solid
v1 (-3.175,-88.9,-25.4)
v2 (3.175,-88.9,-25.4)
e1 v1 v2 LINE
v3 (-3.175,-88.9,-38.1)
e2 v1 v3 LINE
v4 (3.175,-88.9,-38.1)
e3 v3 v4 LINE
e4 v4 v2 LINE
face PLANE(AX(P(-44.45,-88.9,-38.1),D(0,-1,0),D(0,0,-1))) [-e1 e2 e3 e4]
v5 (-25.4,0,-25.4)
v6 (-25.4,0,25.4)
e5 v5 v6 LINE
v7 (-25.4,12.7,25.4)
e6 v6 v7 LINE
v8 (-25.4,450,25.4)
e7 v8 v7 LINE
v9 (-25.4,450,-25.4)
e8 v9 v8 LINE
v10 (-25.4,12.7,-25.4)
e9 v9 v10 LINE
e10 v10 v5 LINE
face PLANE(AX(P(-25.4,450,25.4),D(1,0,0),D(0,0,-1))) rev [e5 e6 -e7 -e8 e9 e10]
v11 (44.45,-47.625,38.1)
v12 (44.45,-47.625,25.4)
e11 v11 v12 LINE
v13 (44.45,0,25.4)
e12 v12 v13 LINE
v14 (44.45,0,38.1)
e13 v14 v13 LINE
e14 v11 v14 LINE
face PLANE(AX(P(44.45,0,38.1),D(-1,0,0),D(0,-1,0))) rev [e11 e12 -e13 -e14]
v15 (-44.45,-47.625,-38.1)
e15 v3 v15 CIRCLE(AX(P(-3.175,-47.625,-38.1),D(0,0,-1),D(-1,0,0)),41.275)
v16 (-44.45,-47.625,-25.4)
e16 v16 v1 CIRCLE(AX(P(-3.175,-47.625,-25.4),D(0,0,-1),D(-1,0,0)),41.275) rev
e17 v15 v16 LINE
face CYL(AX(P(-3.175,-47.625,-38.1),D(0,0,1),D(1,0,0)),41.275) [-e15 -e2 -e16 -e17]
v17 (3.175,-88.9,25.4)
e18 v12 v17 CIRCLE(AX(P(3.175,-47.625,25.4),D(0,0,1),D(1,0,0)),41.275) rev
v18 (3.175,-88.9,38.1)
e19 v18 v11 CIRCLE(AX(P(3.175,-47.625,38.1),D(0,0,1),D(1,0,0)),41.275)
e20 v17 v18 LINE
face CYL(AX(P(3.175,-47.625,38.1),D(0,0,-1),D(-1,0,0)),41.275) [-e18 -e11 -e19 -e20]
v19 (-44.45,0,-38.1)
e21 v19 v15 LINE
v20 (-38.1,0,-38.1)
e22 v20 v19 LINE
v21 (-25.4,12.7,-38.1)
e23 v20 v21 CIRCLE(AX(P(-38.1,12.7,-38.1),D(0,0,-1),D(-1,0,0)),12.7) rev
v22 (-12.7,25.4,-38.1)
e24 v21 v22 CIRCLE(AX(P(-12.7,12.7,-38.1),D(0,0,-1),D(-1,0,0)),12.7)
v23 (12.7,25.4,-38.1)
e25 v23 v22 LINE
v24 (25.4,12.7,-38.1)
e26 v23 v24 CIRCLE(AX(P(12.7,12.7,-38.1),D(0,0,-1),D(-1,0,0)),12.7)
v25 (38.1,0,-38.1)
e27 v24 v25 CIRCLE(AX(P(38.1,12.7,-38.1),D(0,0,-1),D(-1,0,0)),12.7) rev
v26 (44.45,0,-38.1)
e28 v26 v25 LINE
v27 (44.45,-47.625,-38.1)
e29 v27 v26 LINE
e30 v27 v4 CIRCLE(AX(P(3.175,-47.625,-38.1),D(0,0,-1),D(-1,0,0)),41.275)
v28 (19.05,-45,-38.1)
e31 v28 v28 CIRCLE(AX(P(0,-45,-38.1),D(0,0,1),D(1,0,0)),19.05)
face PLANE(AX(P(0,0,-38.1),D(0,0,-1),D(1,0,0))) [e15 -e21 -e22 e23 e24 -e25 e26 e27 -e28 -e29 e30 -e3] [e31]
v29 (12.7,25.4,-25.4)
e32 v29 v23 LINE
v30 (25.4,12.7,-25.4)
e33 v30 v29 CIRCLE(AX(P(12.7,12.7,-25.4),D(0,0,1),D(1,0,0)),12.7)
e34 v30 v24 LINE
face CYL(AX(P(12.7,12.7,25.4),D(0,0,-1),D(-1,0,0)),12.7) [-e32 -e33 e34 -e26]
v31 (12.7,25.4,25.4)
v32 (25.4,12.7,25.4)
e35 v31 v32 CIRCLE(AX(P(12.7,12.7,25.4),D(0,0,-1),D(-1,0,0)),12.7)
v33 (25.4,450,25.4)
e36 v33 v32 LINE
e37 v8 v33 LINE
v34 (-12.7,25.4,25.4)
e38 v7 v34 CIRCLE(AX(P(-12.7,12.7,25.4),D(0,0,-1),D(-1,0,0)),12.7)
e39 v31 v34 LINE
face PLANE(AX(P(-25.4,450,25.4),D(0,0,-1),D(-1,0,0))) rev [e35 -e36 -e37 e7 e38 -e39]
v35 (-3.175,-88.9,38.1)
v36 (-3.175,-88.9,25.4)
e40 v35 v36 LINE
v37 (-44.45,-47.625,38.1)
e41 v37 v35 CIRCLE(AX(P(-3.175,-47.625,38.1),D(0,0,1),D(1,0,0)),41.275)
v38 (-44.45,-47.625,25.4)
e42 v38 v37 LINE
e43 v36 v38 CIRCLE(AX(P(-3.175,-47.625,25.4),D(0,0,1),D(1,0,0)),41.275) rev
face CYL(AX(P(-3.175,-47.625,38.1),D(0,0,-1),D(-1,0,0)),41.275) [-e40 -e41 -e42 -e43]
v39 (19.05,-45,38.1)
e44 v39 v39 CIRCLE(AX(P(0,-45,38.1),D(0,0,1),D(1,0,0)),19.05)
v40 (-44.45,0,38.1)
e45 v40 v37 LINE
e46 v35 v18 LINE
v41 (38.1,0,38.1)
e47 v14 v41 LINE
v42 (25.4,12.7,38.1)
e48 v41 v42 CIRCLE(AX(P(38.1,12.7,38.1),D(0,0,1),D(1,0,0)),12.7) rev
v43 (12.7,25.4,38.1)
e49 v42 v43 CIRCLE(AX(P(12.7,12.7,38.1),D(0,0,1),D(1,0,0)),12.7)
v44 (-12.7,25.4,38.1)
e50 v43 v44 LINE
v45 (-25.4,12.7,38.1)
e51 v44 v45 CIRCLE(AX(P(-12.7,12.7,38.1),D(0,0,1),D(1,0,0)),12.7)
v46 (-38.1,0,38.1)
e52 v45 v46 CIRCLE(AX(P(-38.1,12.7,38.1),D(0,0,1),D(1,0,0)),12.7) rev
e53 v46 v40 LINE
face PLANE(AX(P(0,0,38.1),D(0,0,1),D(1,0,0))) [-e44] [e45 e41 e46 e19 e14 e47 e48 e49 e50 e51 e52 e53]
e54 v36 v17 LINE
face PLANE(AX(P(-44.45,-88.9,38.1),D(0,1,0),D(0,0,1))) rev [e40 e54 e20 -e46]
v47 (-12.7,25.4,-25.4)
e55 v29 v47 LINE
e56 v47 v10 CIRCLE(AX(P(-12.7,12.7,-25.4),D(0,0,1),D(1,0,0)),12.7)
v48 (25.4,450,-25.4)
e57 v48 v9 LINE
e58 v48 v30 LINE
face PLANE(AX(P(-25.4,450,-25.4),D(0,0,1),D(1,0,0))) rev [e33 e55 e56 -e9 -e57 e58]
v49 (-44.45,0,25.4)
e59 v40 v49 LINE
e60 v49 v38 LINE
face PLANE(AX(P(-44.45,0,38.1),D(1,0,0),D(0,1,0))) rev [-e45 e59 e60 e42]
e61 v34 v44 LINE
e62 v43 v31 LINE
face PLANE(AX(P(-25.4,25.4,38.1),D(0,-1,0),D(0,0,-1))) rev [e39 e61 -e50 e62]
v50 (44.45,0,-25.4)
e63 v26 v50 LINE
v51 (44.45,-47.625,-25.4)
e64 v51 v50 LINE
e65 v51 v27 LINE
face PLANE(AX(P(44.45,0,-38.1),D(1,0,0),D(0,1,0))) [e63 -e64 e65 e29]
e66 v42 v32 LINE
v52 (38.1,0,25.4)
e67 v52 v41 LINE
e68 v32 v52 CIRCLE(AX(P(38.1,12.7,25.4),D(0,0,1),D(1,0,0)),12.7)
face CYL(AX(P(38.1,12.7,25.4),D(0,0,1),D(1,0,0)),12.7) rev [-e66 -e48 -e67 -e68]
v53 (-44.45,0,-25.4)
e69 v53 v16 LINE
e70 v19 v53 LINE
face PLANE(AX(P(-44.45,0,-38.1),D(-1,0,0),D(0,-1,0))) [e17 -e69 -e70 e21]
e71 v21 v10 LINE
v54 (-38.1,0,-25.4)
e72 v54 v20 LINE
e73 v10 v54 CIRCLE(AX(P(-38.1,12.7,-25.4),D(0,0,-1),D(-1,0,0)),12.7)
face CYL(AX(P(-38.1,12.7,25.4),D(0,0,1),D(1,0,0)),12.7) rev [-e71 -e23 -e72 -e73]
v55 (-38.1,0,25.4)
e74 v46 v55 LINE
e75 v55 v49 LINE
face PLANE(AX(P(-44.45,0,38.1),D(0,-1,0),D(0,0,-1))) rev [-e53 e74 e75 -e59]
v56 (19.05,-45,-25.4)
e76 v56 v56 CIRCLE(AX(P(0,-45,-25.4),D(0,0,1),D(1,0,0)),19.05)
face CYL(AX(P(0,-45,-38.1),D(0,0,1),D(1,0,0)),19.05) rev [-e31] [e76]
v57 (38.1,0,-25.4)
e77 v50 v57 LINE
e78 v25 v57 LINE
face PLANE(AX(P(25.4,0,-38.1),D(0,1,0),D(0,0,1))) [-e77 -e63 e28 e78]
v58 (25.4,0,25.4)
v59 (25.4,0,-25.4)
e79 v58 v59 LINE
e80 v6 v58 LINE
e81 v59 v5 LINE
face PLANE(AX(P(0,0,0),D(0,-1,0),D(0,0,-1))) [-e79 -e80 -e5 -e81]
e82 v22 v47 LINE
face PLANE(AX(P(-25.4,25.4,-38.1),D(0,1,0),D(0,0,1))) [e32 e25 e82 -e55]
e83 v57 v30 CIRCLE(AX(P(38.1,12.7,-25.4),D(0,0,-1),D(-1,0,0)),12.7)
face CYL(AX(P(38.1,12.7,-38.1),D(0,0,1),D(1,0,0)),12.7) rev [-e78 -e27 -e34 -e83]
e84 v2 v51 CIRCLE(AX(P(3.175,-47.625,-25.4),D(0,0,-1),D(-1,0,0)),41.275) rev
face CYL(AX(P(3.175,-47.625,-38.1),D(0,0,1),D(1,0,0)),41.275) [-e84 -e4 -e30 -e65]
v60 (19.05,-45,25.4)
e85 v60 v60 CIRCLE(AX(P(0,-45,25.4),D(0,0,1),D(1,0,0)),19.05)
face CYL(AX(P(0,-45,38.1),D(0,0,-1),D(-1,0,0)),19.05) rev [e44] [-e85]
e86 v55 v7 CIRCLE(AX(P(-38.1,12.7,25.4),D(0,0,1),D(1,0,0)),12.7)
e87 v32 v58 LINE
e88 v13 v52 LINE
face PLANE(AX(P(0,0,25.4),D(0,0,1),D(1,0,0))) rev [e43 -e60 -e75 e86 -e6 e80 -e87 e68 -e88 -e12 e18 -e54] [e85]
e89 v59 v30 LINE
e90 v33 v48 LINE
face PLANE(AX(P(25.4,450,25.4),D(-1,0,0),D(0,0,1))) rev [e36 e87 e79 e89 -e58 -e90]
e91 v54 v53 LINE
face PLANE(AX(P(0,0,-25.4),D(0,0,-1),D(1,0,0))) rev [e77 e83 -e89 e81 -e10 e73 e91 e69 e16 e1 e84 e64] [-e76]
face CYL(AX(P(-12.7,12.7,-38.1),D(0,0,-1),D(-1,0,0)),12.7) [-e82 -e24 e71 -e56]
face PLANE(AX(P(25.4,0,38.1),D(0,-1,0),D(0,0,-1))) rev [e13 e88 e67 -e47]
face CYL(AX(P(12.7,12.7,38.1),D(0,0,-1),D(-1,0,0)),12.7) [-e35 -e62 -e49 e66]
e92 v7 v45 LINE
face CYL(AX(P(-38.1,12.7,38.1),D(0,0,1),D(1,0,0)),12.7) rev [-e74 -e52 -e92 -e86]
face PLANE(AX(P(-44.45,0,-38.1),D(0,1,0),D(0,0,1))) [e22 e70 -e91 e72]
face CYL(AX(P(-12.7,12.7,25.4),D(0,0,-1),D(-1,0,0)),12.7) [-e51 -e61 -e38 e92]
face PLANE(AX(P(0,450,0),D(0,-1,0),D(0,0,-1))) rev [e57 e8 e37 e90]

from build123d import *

# Parameters (mm, degrees)
SKETCH1_W           = 50.8
SKETCH1_H           = 50.8
BOSS_EXTRUDE1_DEPTH = 450
SKETCH3_R           = 19.05
BOSS_EXTRUDE2_DEPTH = 12.7
FILLET1_R           = 12.7
FILLET3_R           = 41.275


with BuildPart() as part:
    # Sketch1 → Boss-Extrude1 (new body)
    with BuildSketch(Plane(origin=(0, 0, 0), x_dir=(1, 0, 0), z_dir=(0, 1, 0))):
        Rectangle(SKETCH1_W, SKETCH1_H)
    extrude(amount=BOSS_EXTRUDE1_DEPTH)

    # Sketch3 → Boss-Extrude2 (add)
    with BuildSketch(Plane.XY.offset(25.4)):
        Polygon((-25.4, 0), (-25.4, 25.4), (25.4, 25.4), (25.4, 0), (44.45, 0), (44.45, -88.9), (-44.45, -88.9), (-44.45, 0), align=None)
        with Locations((0, -45)):
            Circle(SKETCH3_R, mode=Mode.SUBTRACT)
    boss_extrude2 = extrude(amount=BOSS_EXTRUDE2_DEPTH)

    # Mirror1: Boss-Extrude2 across plane
    add(boss_extrude2.mirror(Plane.XY))

    # Fillet1
    fillet1_edges = [part.edges().sort_by_distance(p)[0] for p in [
        (25.4, 0, 31.75),
        (25.4, 0, -31.75),
        (-25.4, 0, -31.75),
        (-25.4, 0, 31.75),
    ]]
    fillet(fillet1_edges, radius=FILLET1_R)
    fillet1_2_edges = [part.edges().sort_by_distance(p)[0] for p in [
        (25.4, 25.4, -31.75),
        (-25.4, 25.4, -31.75),
        (25.4, 25.4, 31.75),
        (-25.4, 25.4, 31.75),
    ]]
    fillet(fillet1_2_edges, radius=FILLET1_R - 0.0001)  # a hair under: the kernel refuses the full size

    # Fillet3
    fillet3_edges = [part.edges().sort_by_distance(p)[0] for p in [
        (-44.45, -88.9, 31.75),
        (44.45, -88.9, 31.75),
        (-44.45, -88.9, -31.75),
        (44.45, -88.9, -31.75),
    ]]
    fillet(fillet3_edges, radius=FILLET3_R)


solid = part.part
